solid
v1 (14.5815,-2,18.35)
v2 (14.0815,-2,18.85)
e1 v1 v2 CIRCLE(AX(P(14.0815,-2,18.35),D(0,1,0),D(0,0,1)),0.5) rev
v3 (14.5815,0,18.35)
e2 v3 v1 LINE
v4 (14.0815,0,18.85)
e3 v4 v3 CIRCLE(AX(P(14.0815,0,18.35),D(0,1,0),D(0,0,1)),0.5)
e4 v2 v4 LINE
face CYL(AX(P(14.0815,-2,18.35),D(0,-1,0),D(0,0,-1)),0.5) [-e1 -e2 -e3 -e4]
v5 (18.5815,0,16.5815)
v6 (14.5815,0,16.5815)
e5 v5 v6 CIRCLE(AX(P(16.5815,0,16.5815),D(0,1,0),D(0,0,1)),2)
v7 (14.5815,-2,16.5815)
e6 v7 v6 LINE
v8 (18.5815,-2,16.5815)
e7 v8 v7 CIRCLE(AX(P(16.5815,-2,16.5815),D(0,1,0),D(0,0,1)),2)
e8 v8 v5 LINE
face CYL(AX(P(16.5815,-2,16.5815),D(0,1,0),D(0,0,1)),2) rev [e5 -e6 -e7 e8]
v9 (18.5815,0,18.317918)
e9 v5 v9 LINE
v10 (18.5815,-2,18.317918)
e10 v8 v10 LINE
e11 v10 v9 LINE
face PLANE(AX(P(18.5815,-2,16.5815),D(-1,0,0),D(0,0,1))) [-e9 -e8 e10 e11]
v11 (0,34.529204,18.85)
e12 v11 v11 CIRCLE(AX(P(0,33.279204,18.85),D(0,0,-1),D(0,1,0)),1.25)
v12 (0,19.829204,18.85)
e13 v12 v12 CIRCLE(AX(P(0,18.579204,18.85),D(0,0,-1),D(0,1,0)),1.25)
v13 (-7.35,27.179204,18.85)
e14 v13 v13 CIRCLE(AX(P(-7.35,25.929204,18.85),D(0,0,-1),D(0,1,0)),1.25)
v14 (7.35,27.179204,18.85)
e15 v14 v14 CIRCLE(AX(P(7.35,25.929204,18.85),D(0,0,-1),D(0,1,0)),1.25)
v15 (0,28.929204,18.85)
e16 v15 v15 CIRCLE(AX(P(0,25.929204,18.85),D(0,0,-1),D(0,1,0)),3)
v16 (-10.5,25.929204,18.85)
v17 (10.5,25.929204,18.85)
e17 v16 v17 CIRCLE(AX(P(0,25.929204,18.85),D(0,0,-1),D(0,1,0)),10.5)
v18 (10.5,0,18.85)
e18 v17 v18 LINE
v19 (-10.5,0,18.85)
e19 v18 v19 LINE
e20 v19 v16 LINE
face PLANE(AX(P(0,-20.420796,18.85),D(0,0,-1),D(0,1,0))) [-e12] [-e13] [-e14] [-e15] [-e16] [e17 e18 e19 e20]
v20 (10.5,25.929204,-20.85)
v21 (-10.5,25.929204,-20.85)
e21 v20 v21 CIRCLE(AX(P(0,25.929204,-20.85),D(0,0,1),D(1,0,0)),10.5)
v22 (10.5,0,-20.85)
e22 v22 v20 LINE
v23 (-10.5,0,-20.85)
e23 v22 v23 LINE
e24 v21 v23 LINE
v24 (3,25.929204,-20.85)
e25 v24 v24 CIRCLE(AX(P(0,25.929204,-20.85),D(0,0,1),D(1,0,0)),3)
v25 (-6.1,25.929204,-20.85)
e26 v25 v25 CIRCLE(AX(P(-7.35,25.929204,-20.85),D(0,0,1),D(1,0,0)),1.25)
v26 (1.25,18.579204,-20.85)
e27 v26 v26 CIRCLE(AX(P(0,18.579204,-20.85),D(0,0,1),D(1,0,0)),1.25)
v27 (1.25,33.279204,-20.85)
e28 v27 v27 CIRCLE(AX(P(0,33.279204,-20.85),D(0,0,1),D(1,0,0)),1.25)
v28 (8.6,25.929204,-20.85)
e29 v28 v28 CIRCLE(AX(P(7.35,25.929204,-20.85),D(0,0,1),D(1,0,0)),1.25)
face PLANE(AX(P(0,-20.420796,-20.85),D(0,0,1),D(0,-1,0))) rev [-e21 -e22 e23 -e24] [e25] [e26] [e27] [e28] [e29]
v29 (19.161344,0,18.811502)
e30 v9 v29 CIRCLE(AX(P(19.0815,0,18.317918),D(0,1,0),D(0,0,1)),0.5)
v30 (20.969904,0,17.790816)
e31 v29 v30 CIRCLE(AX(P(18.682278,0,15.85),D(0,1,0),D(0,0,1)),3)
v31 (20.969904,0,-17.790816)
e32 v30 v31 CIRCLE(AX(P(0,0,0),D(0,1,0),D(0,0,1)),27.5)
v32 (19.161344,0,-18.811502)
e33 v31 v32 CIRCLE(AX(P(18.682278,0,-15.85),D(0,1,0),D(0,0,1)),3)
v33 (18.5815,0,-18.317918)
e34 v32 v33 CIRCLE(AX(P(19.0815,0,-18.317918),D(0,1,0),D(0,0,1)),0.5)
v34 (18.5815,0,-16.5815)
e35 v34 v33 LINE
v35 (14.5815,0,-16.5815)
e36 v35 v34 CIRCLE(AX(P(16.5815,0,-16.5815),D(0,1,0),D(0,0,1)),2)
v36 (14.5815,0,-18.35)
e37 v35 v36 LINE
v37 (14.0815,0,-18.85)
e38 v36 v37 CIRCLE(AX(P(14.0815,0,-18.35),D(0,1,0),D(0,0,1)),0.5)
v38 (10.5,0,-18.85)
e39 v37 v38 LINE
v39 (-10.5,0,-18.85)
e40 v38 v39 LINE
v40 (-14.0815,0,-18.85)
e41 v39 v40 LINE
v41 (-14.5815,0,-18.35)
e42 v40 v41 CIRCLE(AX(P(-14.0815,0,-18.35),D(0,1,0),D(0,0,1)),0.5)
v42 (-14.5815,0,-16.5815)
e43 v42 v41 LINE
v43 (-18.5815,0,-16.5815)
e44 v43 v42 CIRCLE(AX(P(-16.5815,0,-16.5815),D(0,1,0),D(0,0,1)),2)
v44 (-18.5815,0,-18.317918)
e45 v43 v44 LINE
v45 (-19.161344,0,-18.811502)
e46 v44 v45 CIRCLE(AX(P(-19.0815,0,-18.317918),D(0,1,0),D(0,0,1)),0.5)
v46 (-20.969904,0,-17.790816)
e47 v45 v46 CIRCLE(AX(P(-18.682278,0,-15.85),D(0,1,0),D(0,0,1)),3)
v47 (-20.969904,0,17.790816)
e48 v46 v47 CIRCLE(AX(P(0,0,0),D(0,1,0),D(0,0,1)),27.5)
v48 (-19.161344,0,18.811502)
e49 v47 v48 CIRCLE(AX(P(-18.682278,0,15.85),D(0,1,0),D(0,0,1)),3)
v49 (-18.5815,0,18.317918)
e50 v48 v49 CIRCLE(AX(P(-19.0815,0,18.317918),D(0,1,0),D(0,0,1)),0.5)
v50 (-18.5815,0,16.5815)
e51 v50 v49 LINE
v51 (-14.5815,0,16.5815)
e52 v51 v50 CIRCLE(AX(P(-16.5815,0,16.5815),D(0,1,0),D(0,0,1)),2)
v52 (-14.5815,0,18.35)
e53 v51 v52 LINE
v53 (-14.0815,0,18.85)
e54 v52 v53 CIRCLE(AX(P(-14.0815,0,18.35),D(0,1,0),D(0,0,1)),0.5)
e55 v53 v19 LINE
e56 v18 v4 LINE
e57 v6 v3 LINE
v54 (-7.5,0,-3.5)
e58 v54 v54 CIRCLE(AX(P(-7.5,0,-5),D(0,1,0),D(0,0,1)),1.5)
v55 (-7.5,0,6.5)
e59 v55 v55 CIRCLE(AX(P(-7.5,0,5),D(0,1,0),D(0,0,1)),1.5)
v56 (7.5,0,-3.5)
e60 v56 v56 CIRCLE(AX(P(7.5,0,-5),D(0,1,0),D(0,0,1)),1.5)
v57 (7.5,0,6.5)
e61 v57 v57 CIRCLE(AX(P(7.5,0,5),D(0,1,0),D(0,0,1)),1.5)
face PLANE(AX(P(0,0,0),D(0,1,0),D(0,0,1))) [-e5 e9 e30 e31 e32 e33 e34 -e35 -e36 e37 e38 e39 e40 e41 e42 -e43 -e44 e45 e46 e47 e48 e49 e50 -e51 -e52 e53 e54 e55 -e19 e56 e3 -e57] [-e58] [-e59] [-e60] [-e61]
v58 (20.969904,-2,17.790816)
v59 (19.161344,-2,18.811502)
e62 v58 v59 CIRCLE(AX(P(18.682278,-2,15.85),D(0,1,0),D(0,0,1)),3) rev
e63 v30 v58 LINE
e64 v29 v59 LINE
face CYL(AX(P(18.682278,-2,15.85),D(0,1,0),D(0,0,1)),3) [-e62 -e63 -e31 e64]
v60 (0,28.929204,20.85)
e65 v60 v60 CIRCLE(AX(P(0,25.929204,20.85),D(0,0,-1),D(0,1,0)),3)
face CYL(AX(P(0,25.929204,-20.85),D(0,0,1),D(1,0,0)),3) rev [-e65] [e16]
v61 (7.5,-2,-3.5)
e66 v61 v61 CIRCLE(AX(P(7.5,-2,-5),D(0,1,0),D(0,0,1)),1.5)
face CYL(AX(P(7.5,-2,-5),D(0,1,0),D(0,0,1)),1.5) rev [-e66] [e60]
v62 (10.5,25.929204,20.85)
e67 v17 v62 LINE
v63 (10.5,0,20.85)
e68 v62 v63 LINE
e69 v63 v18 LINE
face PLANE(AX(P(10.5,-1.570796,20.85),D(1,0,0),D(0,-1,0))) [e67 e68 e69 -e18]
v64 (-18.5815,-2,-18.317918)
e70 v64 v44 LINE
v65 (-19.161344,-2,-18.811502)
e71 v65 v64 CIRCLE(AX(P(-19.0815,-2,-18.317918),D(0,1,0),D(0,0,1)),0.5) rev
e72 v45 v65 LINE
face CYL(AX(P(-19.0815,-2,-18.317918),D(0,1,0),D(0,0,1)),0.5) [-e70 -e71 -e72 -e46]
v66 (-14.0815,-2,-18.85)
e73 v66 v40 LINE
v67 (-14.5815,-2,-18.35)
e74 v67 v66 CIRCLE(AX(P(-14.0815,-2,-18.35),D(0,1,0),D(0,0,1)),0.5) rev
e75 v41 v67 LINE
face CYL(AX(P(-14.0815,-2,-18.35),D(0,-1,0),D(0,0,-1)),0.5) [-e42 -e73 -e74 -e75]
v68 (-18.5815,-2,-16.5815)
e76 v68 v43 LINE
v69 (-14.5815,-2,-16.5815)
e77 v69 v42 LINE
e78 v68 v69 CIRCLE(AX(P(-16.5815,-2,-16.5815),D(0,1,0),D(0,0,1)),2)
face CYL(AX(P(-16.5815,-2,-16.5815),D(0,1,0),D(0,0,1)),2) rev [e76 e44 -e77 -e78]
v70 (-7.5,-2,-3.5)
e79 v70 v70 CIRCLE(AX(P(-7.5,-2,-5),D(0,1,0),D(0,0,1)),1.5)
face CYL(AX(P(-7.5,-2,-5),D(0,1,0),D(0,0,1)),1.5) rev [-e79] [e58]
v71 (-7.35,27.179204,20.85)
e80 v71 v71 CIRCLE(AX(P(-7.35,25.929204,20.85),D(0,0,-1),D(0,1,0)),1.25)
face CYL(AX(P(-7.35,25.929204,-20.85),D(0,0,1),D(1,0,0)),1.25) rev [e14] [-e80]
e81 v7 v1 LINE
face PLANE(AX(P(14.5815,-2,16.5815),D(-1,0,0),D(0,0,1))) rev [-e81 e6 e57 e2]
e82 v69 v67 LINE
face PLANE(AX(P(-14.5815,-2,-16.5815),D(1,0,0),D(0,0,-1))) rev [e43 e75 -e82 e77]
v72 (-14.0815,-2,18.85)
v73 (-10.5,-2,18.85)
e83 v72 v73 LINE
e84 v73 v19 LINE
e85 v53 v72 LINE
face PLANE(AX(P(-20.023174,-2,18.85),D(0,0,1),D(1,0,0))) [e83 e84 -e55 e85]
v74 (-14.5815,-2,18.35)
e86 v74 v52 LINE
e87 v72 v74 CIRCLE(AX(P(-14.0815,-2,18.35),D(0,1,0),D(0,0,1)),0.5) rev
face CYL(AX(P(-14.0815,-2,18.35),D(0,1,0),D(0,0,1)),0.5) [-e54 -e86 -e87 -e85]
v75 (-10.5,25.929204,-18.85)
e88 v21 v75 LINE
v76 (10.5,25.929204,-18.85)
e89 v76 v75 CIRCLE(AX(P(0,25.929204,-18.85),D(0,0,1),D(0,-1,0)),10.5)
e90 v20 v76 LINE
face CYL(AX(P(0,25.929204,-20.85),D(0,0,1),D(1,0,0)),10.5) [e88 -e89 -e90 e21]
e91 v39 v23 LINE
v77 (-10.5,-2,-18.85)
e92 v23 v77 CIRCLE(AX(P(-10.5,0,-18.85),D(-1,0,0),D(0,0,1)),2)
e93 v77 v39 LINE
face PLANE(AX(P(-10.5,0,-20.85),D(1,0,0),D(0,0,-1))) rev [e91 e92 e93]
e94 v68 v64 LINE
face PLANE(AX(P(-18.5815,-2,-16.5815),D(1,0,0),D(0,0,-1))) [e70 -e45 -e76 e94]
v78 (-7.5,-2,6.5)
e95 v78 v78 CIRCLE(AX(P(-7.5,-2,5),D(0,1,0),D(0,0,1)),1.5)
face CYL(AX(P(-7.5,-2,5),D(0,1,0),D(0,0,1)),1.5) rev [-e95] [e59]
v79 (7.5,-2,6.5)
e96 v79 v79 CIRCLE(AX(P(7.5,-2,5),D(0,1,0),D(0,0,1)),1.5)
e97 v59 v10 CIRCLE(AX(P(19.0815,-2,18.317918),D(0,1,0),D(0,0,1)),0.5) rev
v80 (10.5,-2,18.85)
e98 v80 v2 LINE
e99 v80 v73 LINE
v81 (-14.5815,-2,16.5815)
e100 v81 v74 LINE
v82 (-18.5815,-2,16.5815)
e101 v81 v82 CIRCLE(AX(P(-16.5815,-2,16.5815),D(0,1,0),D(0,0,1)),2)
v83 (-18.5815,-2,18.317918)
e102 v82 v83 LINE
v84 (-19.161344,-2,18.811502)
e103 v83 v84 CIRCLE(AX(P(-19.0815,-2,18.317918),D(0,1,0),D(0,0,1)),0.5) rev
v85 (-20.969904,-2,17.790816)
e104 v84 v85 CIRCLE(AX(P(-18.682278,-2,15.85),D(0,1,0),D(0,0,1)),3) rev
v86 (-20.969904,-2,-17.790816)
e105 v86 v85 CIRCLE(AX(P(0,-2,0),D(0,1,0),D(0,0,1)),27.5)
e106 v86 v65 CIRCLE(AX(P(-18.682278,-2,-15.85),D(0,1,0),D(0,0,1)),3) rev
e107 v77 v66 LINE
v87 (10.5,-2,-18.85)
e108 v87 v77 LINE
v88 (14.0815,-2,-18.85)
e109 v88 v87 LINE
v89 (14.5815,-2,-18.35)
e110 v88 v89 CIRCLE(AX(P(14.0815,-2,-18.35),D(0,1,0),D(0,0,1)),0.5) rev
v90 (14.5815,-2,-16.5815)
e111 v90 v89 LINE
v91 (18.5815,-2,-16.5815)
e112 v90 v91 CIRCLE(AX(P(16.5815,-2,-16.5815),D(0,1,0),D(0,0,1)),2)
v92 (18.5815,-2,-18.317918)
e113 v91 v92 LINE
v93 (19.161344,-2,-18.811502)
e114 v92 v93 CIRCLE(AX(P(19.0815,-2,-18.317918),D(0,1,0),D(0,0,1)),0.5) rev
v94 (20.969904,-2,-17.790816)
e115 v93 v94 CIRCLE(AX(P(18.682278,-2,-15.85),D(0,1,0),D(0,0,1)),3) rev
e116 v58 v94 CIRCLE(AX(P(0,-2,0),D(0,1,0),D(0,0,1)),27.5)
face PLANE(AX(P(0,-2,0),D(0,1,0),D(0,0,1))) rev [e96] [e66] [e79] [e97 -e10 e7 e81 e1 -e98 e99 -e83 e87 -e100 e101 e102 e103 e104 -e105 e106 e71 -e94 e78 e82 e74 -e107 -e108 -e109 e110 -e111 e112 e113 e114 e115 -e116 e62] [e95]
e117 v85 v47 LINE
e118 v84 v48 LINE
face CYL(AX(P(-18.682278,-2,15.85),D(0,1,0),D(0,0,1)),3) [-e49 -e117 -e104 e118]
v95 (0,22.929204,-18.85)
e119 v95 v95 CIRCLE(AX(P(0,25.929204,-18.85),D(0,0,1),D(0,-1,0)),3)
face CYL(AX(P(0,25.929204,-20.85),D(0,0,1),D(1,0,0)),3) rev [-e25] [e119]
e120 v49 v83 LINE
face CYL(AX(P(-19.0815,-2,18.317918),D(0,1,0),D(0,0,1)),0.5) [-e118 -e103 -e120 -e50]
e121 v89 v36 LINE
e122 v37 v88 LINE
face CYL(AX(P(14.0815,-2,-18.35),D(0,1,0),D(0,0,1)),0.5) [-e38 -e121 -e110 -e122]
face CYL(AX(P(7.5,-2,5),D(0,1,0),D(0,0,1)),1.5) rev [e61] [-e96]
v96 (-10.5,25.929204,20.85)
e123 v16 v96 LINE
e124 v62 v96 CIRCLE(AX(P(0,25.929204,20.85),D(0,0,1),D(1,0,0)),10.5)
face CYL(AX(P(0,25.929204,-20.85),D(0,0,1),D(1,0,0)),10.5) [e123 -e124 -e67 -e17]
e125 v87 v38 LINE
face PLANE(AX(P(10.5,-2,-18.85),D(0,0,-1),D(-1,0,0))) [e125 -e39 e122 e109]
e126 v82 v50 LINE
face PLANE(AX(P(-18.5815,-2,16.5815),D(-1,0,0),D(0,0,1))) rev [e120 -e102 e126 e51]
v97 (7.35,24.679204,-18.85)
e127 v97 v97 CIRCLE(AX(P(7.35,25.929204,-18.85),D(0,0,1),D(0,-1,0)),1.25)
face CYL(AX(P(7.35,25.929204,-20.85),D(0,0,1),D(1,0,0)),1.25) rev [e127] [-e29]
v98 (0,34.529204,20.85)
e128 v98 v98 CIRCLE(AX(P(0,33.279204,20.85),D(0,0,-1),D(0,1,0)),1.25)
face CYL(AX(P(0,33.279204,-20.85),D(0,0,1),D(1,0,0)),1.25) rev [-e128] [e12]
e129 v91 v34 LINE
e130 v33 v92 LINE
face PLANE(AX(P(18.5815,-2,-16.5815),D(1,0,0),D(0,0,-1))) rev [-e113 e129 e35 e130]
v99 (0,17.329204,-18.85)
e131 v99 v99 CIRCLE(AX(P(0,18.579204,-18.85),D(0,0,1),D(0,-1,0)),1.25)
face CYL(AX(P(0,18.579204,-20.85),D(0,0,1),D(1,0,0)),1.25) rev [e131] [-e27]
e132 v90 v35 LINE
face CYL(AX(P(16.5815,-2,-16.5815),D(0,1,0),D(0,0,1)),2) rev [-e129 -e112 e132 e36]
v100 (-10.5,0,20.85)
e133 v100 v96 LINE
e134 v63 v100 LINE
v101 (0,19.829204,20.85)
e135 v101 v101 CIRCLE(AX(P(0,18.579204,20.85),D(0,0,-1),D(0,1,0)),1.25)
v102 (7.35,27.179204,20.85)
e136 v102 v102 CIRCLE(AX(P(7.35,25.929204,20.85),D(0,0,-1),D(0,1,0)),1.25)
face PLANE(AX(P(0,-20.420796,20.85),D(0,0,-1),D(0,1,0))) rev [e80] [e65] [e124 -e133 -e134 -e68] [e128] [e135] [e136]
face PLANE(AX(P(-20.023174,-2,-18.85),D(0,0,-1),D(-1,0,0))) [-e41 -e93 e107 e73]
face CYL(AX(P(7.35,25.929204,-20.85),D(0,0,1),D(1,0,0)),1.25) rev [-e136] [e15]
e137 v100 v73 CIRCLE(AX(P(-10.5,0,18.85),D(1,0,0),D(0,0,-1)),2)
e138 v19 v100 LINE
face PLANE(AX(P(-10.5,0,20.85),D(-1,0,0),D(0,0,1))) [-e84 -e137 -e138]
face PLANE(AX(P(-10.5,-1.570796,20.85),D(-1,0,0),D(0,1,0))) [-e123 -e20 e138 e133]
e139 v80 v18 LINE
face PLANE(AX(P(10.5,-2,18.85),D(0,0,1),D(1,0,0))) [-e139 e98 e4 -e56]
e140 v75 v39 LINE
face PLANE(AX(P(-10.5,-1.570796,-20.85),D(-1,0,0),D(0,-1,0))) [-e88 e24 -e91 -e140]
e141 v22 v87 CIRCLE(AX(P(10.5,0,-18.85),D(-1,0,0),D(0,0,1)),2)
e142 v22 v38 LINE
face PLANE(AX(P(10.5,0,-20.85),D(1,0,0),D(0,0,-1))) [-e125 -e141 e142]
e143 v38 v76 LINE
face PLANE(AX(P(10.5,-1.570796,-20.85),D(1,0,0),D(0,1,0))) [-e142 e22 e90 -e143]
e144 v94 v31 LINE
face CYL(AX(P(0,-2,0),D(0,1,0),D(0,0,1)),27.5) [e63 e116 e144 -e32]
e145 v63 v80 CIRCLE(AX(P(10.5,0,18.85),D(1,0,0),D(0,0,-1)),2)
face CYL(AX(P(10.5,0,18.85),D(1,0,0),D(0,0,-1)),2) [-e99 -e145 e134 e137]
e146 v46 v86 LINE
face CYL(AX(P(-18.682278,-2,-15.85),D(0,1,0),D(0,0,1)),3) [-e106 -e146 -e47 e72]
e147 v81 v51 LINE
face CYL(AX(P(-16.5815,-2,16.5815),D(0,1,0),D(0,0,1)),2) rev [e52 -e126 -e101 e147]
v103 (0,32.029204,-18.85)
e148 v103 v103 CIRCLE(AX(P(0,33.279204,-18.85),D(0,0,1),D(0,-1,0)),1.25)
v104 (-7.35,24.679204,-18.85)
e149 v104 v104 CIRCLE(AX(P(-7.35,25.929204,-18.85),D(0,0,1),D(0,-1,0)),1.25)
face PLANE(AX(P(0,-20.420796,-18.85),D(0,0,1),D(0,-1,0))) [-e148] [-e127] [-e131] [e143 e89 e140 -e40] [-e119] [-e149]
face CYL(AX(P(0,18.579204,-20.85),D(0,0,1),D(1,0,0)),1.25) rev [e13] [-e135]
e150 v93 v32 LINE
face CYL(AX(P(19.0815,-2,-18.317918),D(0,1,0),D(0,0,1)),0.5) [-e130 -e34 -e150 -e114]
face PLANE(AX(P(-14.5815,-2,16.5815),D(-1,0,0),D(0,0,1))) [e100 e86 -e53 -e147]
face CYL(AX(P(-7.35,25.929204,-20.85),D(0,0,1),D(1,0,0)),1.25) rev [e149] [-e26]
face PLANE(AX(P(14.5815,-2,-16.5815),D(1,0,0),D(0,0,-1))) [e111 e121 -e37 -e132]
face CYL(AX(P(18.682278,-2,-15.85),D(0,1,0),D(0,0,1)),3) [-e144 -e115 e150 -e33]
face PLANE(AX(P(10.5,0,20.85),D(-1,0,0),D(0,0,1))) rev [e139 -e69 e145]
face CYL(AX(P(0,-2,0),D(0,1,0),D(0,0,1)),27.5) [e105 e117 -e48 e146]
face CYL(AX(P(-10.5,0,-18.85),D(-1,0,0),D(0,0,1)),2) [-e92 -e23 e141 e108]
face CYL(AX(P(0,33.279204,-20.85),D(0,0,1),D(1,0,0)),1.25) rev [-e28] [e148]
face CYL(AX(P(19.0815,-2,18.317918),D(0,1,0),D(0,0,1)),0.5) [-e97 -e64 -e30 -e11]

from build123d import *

# Parameters (mm, degrees)
BRIDA_BASE1_DEPTH               = 2
PLIEGUE_START                   = -10.5
PLIEGUE_CROQUIZADO2_DEPTH       = 21
PLIEGUE_CROQUIZADO2_2_OUTLINE_W = 36.429203673
PLIEGUE_CROQUIZADO2_2_OUTLINE_H = 2
PLIEGUE_CROQUIZADO2_2_DEPTH     = 21
CROQUIS9_R                      = 1.5
CORTAR_EXTRUIR1_DEPTH           = 51.180268834
CORTAR_EXTRUIR2_DEPTH           = 62.824160975
CORTAR_EXTRUIR2_DEPTH_BACK      = 62.824160975
CROQUIS10_R                     = 1.25
CROQUIS10_R_2                   = 3
REDONDEO3_R                     = 3
REDONDEO4_R                     = 0.5


# Read off the part's stored shape, not the designer's step: Pliegue croquizado2
# Sheet-metal steps are written as plain solids
with BuildPart() as part:
    # Croquis1 → Brida base1 (new body)
    with BuildSketch(Plane(origin=(0, 0, 0), x_dir=(1, 0, 0), z_dir=(0, 1, 0))):
        with BuildLine():
            Line((10.5, 18.85), (20.023174074, 18.85))
            ThreePointArc((20.023174074, 18.85), (27.5, 0), (20.023174074, -18.85))
            Line((20.023174074, -18.85), (10.5, -18.85))
            Line((10.5, -18.85), (10.5, -56.85))
            Line((10.5, -56.85), (-10.5, -56.85))
            Line((-10.5, -56.85), (-10.5, -18.85))
            Line((-10.5, -18.85), (-20.023174074, -18.85))
            ThreePointArc((-20.023174074, -18.85), (-27.5, 0), (-20.023174074, 18.85))
            Line((-20.023174074, 18.85), (-10.5, 18.85))
            Line((-10.5, 18.85), (-10.5, 56.85))
            Line((-10.5, 56.85), (10.5, 56.85))
            Line((10.5, 56.85), (10.5, 18.85))
        make_face()
    extrude(amount=-BRIDA_BASE1_DEPTH)

    # Pliegue croquizado2 outline → Pliegue croquizado2 (cut)
    with BuildSketch(Plane.YZ.offset(PLIEGUE_START)):
        with BuildLine():
            Line((0, -56.85), (0, -20.85))
            ThreePointArc((0, -20.85), (-1.414213562, -20.264213562), (-2, -18.85))
            Line((-2, -18.85), (-2, -56.85))
            Line((-2, -56.85), (0, -56.85))
        make_face()
        with BuildLine():
            Line((-2, 56.85), (-2, 18.85))
            ThreePointArc((-2, 18.85), (-1.414213562, 20.264213562), (0, 20.85))
            Line((0, 20.85), (0, 56.85))
            Line((0, 56.85), (-2, 56.85))
        make_face()
    extrude(amount=PLIEGUE_CROQUIZADO2_DEPTH, mode=Mode.SUBTRACT)

    # Pliegue croquizado2 2 outline → Pliegue croquizado2 2 (add)
    with BuildSketch(Plane.YZ.offset(PLIEGUE_START)):
        with Locations((18.214601837, -19.85)):
            Rectangle(PLIEGUE_CROQUIZADO2_2_OUTLINE_W, PLIEGUE_CROQUIZADO2_2_OUTLINE_H)
        with Locations((18.214601837, 19.85)):
            Rectangle(PLIEGUE_CROQUIZADO2_2_OUTLINE_W, PLIEGUE_CROQUIZADO2_2_OUTLINE_H)
    extrude(amount=PLIEGUE_CROQUIZADO2_2_DEPTH)

    # Croquis9 → Cortar-Extruir1 (cut, through all)
    with BuildSketch(Plane(origin=(0, 0, 0), x_dir=(1, 0, 0), z_dir=(0, 1, 0))):
        with Locations(Location((-7.5, 5, 0), (0, 0, 270))):
            Circle(CROQUIS9_R)
        with Locations(Location((-7.5, -5, 0), (0, 0, 270))):
            Circle(CROQUIS9_R)
        with Locations(Location((7.5, -5, 0), (0, 0, 270))):
            Circle(CROQUIS9_R)
        with Locations(Location((7.5, 5, 0), (0, 0, 270))):
            Circle(CROQUIS9_R)
        with BuildLine():
            Line((-18.5815, 16.5815), (-18.5815, 18.85))
            Line((-18.5815, 18.85), (-14.5815, 18.85))
            Line((-14.5815, 18.85), (-14.5815, 16.5815))
            ThreePointArc((-14.5815, 16.5815), (-16.5815, 14.5815), (-18.5815, 16.5815))
        make_face()
        with BuildLine():
            Line((14.5815, 18.85), (18.5815, 18.85))
            Line((18.5815, 18.85), (18.5815, 16.5815))
            ThreePointArc((18.5815, 16.5815), (16.5815, 14.5815), (14.5815, 16.5815))
            Line((14.5815, 16.5815), (14.5815, 18.85))
        make_face()
        with BuildLine():
            Line((14.5815, -18.85), (18.5815, -18.85))
            Line((18.5815, -18.85), (18.5815, -16.5815))
            ThreePointArc((18.5815, -16.5815), (16.5815, -14.5815), (14.5815, -16.5815))
            Line((14.5815, -16.5815), (14.5815, -18.85))
        make_face()
        with BuildLine():
            Line((-18.5815, -16.5815), (-18.5815, -18.85))
            Line((-18.5815, -18.85), (-14.5815, -18.85))
            Line((-14.5815, -18.85), (-14.5815, -16.5815))
            ThreePointArc((-14.5815, -16.5815), (-16.5815, -14.5815), (-18.5815, -16.5815))
        make_face()
    extrude(amount=-CORTAR_EXTRUIR1_DEPTH, mode=Mode.SUBTRACT)

    # Croquis10 → Cortar-Extruir2 (cut, two sides: drawn at the far end of the back side and taken through both)
    with BuildSketch(Plane.XY.offset(20.85).offset(-CORTAR_EXTRUIR2_DEPTH_BACK)):
        with BuildLine():
            ThreePointArc((-10.5, 25.929203673), (-7.424621199, 33.353824879), (8e-09, 36.429203673))
            Line((8e-09, 36.429203673), (-10.5, 36.429203673))
            Line((-10.5, 36.429203673), (-10.5, 25.929203673))
        make_face()
        with BuildLine():
            ThreePointArc((8e-09, 36.429203673), (7.424621205, 33.353824873), (10.5, 25.929203673))
            Line((10.5, 25.929203673), (10.5, 36.429203673))
            Line((10.5, 36.429203673), (8e-09, 36.429203673))
        make_face()
        with Locations(Location((0, 18.579203673, 0), (0, 0, 90))):
            Circle(CROQUIS10_R)
        with Locations(Location((0, 25.929203673, 0), (0, 0, 90))):
            Circle(CROQUIS10_R_2)
        with Locations(Location((7.35, 25.929203673, 0), (0, 0, 90))):
            Circle(CROQUIS10_R)
        with Locations(Location((0, 33.279203673, 0), (0, 0, 90))):
            Circle(CROQUIS10_R)
        with Locations(Location((-7.35, 25.929203673, 0), (0, 0, 90))):
            Circle(CROQUIS10_R)
    extrude(amount=CORTAR_EXTRUIR2_DEPTH + CORTAR_EXTRUIR2_DEPTH_BACK, mode=Mode.SUBTRACT)

    # Redondeo3
    redondeo3_edges = [part.edges().sort_by_distance(p)[0] for p in [
        (20.023174074, -1, -18.85),
        (20.023174074, -1, 18.85),
        (-20.023174074, -1, 18.85),
        (-20.023174074, -1, -18.85),
    ]]
    fillet(redondeo3_edges, radius=REDONDEO3_R)

    # Redondeo4
    redondeo4_edges = [part.edges().sort_by_distance(p)[0] for p in [
        (18.5815, -1, 18.85),
        (14.5815, -1, 18.85),
        (18.5815, -1, -18.85),
        (14.5815, -1, -18.85),
        (-18.5815, -1, 18.85),
        (-14.5815, -1, 18.85),
        (-18.5815, -1, -18.85),
        (-14.5815, -1, -18.85),
    ]]
    fillet(redondeo4_edges, radius=REDONDEO4_R)


solid = part.part
